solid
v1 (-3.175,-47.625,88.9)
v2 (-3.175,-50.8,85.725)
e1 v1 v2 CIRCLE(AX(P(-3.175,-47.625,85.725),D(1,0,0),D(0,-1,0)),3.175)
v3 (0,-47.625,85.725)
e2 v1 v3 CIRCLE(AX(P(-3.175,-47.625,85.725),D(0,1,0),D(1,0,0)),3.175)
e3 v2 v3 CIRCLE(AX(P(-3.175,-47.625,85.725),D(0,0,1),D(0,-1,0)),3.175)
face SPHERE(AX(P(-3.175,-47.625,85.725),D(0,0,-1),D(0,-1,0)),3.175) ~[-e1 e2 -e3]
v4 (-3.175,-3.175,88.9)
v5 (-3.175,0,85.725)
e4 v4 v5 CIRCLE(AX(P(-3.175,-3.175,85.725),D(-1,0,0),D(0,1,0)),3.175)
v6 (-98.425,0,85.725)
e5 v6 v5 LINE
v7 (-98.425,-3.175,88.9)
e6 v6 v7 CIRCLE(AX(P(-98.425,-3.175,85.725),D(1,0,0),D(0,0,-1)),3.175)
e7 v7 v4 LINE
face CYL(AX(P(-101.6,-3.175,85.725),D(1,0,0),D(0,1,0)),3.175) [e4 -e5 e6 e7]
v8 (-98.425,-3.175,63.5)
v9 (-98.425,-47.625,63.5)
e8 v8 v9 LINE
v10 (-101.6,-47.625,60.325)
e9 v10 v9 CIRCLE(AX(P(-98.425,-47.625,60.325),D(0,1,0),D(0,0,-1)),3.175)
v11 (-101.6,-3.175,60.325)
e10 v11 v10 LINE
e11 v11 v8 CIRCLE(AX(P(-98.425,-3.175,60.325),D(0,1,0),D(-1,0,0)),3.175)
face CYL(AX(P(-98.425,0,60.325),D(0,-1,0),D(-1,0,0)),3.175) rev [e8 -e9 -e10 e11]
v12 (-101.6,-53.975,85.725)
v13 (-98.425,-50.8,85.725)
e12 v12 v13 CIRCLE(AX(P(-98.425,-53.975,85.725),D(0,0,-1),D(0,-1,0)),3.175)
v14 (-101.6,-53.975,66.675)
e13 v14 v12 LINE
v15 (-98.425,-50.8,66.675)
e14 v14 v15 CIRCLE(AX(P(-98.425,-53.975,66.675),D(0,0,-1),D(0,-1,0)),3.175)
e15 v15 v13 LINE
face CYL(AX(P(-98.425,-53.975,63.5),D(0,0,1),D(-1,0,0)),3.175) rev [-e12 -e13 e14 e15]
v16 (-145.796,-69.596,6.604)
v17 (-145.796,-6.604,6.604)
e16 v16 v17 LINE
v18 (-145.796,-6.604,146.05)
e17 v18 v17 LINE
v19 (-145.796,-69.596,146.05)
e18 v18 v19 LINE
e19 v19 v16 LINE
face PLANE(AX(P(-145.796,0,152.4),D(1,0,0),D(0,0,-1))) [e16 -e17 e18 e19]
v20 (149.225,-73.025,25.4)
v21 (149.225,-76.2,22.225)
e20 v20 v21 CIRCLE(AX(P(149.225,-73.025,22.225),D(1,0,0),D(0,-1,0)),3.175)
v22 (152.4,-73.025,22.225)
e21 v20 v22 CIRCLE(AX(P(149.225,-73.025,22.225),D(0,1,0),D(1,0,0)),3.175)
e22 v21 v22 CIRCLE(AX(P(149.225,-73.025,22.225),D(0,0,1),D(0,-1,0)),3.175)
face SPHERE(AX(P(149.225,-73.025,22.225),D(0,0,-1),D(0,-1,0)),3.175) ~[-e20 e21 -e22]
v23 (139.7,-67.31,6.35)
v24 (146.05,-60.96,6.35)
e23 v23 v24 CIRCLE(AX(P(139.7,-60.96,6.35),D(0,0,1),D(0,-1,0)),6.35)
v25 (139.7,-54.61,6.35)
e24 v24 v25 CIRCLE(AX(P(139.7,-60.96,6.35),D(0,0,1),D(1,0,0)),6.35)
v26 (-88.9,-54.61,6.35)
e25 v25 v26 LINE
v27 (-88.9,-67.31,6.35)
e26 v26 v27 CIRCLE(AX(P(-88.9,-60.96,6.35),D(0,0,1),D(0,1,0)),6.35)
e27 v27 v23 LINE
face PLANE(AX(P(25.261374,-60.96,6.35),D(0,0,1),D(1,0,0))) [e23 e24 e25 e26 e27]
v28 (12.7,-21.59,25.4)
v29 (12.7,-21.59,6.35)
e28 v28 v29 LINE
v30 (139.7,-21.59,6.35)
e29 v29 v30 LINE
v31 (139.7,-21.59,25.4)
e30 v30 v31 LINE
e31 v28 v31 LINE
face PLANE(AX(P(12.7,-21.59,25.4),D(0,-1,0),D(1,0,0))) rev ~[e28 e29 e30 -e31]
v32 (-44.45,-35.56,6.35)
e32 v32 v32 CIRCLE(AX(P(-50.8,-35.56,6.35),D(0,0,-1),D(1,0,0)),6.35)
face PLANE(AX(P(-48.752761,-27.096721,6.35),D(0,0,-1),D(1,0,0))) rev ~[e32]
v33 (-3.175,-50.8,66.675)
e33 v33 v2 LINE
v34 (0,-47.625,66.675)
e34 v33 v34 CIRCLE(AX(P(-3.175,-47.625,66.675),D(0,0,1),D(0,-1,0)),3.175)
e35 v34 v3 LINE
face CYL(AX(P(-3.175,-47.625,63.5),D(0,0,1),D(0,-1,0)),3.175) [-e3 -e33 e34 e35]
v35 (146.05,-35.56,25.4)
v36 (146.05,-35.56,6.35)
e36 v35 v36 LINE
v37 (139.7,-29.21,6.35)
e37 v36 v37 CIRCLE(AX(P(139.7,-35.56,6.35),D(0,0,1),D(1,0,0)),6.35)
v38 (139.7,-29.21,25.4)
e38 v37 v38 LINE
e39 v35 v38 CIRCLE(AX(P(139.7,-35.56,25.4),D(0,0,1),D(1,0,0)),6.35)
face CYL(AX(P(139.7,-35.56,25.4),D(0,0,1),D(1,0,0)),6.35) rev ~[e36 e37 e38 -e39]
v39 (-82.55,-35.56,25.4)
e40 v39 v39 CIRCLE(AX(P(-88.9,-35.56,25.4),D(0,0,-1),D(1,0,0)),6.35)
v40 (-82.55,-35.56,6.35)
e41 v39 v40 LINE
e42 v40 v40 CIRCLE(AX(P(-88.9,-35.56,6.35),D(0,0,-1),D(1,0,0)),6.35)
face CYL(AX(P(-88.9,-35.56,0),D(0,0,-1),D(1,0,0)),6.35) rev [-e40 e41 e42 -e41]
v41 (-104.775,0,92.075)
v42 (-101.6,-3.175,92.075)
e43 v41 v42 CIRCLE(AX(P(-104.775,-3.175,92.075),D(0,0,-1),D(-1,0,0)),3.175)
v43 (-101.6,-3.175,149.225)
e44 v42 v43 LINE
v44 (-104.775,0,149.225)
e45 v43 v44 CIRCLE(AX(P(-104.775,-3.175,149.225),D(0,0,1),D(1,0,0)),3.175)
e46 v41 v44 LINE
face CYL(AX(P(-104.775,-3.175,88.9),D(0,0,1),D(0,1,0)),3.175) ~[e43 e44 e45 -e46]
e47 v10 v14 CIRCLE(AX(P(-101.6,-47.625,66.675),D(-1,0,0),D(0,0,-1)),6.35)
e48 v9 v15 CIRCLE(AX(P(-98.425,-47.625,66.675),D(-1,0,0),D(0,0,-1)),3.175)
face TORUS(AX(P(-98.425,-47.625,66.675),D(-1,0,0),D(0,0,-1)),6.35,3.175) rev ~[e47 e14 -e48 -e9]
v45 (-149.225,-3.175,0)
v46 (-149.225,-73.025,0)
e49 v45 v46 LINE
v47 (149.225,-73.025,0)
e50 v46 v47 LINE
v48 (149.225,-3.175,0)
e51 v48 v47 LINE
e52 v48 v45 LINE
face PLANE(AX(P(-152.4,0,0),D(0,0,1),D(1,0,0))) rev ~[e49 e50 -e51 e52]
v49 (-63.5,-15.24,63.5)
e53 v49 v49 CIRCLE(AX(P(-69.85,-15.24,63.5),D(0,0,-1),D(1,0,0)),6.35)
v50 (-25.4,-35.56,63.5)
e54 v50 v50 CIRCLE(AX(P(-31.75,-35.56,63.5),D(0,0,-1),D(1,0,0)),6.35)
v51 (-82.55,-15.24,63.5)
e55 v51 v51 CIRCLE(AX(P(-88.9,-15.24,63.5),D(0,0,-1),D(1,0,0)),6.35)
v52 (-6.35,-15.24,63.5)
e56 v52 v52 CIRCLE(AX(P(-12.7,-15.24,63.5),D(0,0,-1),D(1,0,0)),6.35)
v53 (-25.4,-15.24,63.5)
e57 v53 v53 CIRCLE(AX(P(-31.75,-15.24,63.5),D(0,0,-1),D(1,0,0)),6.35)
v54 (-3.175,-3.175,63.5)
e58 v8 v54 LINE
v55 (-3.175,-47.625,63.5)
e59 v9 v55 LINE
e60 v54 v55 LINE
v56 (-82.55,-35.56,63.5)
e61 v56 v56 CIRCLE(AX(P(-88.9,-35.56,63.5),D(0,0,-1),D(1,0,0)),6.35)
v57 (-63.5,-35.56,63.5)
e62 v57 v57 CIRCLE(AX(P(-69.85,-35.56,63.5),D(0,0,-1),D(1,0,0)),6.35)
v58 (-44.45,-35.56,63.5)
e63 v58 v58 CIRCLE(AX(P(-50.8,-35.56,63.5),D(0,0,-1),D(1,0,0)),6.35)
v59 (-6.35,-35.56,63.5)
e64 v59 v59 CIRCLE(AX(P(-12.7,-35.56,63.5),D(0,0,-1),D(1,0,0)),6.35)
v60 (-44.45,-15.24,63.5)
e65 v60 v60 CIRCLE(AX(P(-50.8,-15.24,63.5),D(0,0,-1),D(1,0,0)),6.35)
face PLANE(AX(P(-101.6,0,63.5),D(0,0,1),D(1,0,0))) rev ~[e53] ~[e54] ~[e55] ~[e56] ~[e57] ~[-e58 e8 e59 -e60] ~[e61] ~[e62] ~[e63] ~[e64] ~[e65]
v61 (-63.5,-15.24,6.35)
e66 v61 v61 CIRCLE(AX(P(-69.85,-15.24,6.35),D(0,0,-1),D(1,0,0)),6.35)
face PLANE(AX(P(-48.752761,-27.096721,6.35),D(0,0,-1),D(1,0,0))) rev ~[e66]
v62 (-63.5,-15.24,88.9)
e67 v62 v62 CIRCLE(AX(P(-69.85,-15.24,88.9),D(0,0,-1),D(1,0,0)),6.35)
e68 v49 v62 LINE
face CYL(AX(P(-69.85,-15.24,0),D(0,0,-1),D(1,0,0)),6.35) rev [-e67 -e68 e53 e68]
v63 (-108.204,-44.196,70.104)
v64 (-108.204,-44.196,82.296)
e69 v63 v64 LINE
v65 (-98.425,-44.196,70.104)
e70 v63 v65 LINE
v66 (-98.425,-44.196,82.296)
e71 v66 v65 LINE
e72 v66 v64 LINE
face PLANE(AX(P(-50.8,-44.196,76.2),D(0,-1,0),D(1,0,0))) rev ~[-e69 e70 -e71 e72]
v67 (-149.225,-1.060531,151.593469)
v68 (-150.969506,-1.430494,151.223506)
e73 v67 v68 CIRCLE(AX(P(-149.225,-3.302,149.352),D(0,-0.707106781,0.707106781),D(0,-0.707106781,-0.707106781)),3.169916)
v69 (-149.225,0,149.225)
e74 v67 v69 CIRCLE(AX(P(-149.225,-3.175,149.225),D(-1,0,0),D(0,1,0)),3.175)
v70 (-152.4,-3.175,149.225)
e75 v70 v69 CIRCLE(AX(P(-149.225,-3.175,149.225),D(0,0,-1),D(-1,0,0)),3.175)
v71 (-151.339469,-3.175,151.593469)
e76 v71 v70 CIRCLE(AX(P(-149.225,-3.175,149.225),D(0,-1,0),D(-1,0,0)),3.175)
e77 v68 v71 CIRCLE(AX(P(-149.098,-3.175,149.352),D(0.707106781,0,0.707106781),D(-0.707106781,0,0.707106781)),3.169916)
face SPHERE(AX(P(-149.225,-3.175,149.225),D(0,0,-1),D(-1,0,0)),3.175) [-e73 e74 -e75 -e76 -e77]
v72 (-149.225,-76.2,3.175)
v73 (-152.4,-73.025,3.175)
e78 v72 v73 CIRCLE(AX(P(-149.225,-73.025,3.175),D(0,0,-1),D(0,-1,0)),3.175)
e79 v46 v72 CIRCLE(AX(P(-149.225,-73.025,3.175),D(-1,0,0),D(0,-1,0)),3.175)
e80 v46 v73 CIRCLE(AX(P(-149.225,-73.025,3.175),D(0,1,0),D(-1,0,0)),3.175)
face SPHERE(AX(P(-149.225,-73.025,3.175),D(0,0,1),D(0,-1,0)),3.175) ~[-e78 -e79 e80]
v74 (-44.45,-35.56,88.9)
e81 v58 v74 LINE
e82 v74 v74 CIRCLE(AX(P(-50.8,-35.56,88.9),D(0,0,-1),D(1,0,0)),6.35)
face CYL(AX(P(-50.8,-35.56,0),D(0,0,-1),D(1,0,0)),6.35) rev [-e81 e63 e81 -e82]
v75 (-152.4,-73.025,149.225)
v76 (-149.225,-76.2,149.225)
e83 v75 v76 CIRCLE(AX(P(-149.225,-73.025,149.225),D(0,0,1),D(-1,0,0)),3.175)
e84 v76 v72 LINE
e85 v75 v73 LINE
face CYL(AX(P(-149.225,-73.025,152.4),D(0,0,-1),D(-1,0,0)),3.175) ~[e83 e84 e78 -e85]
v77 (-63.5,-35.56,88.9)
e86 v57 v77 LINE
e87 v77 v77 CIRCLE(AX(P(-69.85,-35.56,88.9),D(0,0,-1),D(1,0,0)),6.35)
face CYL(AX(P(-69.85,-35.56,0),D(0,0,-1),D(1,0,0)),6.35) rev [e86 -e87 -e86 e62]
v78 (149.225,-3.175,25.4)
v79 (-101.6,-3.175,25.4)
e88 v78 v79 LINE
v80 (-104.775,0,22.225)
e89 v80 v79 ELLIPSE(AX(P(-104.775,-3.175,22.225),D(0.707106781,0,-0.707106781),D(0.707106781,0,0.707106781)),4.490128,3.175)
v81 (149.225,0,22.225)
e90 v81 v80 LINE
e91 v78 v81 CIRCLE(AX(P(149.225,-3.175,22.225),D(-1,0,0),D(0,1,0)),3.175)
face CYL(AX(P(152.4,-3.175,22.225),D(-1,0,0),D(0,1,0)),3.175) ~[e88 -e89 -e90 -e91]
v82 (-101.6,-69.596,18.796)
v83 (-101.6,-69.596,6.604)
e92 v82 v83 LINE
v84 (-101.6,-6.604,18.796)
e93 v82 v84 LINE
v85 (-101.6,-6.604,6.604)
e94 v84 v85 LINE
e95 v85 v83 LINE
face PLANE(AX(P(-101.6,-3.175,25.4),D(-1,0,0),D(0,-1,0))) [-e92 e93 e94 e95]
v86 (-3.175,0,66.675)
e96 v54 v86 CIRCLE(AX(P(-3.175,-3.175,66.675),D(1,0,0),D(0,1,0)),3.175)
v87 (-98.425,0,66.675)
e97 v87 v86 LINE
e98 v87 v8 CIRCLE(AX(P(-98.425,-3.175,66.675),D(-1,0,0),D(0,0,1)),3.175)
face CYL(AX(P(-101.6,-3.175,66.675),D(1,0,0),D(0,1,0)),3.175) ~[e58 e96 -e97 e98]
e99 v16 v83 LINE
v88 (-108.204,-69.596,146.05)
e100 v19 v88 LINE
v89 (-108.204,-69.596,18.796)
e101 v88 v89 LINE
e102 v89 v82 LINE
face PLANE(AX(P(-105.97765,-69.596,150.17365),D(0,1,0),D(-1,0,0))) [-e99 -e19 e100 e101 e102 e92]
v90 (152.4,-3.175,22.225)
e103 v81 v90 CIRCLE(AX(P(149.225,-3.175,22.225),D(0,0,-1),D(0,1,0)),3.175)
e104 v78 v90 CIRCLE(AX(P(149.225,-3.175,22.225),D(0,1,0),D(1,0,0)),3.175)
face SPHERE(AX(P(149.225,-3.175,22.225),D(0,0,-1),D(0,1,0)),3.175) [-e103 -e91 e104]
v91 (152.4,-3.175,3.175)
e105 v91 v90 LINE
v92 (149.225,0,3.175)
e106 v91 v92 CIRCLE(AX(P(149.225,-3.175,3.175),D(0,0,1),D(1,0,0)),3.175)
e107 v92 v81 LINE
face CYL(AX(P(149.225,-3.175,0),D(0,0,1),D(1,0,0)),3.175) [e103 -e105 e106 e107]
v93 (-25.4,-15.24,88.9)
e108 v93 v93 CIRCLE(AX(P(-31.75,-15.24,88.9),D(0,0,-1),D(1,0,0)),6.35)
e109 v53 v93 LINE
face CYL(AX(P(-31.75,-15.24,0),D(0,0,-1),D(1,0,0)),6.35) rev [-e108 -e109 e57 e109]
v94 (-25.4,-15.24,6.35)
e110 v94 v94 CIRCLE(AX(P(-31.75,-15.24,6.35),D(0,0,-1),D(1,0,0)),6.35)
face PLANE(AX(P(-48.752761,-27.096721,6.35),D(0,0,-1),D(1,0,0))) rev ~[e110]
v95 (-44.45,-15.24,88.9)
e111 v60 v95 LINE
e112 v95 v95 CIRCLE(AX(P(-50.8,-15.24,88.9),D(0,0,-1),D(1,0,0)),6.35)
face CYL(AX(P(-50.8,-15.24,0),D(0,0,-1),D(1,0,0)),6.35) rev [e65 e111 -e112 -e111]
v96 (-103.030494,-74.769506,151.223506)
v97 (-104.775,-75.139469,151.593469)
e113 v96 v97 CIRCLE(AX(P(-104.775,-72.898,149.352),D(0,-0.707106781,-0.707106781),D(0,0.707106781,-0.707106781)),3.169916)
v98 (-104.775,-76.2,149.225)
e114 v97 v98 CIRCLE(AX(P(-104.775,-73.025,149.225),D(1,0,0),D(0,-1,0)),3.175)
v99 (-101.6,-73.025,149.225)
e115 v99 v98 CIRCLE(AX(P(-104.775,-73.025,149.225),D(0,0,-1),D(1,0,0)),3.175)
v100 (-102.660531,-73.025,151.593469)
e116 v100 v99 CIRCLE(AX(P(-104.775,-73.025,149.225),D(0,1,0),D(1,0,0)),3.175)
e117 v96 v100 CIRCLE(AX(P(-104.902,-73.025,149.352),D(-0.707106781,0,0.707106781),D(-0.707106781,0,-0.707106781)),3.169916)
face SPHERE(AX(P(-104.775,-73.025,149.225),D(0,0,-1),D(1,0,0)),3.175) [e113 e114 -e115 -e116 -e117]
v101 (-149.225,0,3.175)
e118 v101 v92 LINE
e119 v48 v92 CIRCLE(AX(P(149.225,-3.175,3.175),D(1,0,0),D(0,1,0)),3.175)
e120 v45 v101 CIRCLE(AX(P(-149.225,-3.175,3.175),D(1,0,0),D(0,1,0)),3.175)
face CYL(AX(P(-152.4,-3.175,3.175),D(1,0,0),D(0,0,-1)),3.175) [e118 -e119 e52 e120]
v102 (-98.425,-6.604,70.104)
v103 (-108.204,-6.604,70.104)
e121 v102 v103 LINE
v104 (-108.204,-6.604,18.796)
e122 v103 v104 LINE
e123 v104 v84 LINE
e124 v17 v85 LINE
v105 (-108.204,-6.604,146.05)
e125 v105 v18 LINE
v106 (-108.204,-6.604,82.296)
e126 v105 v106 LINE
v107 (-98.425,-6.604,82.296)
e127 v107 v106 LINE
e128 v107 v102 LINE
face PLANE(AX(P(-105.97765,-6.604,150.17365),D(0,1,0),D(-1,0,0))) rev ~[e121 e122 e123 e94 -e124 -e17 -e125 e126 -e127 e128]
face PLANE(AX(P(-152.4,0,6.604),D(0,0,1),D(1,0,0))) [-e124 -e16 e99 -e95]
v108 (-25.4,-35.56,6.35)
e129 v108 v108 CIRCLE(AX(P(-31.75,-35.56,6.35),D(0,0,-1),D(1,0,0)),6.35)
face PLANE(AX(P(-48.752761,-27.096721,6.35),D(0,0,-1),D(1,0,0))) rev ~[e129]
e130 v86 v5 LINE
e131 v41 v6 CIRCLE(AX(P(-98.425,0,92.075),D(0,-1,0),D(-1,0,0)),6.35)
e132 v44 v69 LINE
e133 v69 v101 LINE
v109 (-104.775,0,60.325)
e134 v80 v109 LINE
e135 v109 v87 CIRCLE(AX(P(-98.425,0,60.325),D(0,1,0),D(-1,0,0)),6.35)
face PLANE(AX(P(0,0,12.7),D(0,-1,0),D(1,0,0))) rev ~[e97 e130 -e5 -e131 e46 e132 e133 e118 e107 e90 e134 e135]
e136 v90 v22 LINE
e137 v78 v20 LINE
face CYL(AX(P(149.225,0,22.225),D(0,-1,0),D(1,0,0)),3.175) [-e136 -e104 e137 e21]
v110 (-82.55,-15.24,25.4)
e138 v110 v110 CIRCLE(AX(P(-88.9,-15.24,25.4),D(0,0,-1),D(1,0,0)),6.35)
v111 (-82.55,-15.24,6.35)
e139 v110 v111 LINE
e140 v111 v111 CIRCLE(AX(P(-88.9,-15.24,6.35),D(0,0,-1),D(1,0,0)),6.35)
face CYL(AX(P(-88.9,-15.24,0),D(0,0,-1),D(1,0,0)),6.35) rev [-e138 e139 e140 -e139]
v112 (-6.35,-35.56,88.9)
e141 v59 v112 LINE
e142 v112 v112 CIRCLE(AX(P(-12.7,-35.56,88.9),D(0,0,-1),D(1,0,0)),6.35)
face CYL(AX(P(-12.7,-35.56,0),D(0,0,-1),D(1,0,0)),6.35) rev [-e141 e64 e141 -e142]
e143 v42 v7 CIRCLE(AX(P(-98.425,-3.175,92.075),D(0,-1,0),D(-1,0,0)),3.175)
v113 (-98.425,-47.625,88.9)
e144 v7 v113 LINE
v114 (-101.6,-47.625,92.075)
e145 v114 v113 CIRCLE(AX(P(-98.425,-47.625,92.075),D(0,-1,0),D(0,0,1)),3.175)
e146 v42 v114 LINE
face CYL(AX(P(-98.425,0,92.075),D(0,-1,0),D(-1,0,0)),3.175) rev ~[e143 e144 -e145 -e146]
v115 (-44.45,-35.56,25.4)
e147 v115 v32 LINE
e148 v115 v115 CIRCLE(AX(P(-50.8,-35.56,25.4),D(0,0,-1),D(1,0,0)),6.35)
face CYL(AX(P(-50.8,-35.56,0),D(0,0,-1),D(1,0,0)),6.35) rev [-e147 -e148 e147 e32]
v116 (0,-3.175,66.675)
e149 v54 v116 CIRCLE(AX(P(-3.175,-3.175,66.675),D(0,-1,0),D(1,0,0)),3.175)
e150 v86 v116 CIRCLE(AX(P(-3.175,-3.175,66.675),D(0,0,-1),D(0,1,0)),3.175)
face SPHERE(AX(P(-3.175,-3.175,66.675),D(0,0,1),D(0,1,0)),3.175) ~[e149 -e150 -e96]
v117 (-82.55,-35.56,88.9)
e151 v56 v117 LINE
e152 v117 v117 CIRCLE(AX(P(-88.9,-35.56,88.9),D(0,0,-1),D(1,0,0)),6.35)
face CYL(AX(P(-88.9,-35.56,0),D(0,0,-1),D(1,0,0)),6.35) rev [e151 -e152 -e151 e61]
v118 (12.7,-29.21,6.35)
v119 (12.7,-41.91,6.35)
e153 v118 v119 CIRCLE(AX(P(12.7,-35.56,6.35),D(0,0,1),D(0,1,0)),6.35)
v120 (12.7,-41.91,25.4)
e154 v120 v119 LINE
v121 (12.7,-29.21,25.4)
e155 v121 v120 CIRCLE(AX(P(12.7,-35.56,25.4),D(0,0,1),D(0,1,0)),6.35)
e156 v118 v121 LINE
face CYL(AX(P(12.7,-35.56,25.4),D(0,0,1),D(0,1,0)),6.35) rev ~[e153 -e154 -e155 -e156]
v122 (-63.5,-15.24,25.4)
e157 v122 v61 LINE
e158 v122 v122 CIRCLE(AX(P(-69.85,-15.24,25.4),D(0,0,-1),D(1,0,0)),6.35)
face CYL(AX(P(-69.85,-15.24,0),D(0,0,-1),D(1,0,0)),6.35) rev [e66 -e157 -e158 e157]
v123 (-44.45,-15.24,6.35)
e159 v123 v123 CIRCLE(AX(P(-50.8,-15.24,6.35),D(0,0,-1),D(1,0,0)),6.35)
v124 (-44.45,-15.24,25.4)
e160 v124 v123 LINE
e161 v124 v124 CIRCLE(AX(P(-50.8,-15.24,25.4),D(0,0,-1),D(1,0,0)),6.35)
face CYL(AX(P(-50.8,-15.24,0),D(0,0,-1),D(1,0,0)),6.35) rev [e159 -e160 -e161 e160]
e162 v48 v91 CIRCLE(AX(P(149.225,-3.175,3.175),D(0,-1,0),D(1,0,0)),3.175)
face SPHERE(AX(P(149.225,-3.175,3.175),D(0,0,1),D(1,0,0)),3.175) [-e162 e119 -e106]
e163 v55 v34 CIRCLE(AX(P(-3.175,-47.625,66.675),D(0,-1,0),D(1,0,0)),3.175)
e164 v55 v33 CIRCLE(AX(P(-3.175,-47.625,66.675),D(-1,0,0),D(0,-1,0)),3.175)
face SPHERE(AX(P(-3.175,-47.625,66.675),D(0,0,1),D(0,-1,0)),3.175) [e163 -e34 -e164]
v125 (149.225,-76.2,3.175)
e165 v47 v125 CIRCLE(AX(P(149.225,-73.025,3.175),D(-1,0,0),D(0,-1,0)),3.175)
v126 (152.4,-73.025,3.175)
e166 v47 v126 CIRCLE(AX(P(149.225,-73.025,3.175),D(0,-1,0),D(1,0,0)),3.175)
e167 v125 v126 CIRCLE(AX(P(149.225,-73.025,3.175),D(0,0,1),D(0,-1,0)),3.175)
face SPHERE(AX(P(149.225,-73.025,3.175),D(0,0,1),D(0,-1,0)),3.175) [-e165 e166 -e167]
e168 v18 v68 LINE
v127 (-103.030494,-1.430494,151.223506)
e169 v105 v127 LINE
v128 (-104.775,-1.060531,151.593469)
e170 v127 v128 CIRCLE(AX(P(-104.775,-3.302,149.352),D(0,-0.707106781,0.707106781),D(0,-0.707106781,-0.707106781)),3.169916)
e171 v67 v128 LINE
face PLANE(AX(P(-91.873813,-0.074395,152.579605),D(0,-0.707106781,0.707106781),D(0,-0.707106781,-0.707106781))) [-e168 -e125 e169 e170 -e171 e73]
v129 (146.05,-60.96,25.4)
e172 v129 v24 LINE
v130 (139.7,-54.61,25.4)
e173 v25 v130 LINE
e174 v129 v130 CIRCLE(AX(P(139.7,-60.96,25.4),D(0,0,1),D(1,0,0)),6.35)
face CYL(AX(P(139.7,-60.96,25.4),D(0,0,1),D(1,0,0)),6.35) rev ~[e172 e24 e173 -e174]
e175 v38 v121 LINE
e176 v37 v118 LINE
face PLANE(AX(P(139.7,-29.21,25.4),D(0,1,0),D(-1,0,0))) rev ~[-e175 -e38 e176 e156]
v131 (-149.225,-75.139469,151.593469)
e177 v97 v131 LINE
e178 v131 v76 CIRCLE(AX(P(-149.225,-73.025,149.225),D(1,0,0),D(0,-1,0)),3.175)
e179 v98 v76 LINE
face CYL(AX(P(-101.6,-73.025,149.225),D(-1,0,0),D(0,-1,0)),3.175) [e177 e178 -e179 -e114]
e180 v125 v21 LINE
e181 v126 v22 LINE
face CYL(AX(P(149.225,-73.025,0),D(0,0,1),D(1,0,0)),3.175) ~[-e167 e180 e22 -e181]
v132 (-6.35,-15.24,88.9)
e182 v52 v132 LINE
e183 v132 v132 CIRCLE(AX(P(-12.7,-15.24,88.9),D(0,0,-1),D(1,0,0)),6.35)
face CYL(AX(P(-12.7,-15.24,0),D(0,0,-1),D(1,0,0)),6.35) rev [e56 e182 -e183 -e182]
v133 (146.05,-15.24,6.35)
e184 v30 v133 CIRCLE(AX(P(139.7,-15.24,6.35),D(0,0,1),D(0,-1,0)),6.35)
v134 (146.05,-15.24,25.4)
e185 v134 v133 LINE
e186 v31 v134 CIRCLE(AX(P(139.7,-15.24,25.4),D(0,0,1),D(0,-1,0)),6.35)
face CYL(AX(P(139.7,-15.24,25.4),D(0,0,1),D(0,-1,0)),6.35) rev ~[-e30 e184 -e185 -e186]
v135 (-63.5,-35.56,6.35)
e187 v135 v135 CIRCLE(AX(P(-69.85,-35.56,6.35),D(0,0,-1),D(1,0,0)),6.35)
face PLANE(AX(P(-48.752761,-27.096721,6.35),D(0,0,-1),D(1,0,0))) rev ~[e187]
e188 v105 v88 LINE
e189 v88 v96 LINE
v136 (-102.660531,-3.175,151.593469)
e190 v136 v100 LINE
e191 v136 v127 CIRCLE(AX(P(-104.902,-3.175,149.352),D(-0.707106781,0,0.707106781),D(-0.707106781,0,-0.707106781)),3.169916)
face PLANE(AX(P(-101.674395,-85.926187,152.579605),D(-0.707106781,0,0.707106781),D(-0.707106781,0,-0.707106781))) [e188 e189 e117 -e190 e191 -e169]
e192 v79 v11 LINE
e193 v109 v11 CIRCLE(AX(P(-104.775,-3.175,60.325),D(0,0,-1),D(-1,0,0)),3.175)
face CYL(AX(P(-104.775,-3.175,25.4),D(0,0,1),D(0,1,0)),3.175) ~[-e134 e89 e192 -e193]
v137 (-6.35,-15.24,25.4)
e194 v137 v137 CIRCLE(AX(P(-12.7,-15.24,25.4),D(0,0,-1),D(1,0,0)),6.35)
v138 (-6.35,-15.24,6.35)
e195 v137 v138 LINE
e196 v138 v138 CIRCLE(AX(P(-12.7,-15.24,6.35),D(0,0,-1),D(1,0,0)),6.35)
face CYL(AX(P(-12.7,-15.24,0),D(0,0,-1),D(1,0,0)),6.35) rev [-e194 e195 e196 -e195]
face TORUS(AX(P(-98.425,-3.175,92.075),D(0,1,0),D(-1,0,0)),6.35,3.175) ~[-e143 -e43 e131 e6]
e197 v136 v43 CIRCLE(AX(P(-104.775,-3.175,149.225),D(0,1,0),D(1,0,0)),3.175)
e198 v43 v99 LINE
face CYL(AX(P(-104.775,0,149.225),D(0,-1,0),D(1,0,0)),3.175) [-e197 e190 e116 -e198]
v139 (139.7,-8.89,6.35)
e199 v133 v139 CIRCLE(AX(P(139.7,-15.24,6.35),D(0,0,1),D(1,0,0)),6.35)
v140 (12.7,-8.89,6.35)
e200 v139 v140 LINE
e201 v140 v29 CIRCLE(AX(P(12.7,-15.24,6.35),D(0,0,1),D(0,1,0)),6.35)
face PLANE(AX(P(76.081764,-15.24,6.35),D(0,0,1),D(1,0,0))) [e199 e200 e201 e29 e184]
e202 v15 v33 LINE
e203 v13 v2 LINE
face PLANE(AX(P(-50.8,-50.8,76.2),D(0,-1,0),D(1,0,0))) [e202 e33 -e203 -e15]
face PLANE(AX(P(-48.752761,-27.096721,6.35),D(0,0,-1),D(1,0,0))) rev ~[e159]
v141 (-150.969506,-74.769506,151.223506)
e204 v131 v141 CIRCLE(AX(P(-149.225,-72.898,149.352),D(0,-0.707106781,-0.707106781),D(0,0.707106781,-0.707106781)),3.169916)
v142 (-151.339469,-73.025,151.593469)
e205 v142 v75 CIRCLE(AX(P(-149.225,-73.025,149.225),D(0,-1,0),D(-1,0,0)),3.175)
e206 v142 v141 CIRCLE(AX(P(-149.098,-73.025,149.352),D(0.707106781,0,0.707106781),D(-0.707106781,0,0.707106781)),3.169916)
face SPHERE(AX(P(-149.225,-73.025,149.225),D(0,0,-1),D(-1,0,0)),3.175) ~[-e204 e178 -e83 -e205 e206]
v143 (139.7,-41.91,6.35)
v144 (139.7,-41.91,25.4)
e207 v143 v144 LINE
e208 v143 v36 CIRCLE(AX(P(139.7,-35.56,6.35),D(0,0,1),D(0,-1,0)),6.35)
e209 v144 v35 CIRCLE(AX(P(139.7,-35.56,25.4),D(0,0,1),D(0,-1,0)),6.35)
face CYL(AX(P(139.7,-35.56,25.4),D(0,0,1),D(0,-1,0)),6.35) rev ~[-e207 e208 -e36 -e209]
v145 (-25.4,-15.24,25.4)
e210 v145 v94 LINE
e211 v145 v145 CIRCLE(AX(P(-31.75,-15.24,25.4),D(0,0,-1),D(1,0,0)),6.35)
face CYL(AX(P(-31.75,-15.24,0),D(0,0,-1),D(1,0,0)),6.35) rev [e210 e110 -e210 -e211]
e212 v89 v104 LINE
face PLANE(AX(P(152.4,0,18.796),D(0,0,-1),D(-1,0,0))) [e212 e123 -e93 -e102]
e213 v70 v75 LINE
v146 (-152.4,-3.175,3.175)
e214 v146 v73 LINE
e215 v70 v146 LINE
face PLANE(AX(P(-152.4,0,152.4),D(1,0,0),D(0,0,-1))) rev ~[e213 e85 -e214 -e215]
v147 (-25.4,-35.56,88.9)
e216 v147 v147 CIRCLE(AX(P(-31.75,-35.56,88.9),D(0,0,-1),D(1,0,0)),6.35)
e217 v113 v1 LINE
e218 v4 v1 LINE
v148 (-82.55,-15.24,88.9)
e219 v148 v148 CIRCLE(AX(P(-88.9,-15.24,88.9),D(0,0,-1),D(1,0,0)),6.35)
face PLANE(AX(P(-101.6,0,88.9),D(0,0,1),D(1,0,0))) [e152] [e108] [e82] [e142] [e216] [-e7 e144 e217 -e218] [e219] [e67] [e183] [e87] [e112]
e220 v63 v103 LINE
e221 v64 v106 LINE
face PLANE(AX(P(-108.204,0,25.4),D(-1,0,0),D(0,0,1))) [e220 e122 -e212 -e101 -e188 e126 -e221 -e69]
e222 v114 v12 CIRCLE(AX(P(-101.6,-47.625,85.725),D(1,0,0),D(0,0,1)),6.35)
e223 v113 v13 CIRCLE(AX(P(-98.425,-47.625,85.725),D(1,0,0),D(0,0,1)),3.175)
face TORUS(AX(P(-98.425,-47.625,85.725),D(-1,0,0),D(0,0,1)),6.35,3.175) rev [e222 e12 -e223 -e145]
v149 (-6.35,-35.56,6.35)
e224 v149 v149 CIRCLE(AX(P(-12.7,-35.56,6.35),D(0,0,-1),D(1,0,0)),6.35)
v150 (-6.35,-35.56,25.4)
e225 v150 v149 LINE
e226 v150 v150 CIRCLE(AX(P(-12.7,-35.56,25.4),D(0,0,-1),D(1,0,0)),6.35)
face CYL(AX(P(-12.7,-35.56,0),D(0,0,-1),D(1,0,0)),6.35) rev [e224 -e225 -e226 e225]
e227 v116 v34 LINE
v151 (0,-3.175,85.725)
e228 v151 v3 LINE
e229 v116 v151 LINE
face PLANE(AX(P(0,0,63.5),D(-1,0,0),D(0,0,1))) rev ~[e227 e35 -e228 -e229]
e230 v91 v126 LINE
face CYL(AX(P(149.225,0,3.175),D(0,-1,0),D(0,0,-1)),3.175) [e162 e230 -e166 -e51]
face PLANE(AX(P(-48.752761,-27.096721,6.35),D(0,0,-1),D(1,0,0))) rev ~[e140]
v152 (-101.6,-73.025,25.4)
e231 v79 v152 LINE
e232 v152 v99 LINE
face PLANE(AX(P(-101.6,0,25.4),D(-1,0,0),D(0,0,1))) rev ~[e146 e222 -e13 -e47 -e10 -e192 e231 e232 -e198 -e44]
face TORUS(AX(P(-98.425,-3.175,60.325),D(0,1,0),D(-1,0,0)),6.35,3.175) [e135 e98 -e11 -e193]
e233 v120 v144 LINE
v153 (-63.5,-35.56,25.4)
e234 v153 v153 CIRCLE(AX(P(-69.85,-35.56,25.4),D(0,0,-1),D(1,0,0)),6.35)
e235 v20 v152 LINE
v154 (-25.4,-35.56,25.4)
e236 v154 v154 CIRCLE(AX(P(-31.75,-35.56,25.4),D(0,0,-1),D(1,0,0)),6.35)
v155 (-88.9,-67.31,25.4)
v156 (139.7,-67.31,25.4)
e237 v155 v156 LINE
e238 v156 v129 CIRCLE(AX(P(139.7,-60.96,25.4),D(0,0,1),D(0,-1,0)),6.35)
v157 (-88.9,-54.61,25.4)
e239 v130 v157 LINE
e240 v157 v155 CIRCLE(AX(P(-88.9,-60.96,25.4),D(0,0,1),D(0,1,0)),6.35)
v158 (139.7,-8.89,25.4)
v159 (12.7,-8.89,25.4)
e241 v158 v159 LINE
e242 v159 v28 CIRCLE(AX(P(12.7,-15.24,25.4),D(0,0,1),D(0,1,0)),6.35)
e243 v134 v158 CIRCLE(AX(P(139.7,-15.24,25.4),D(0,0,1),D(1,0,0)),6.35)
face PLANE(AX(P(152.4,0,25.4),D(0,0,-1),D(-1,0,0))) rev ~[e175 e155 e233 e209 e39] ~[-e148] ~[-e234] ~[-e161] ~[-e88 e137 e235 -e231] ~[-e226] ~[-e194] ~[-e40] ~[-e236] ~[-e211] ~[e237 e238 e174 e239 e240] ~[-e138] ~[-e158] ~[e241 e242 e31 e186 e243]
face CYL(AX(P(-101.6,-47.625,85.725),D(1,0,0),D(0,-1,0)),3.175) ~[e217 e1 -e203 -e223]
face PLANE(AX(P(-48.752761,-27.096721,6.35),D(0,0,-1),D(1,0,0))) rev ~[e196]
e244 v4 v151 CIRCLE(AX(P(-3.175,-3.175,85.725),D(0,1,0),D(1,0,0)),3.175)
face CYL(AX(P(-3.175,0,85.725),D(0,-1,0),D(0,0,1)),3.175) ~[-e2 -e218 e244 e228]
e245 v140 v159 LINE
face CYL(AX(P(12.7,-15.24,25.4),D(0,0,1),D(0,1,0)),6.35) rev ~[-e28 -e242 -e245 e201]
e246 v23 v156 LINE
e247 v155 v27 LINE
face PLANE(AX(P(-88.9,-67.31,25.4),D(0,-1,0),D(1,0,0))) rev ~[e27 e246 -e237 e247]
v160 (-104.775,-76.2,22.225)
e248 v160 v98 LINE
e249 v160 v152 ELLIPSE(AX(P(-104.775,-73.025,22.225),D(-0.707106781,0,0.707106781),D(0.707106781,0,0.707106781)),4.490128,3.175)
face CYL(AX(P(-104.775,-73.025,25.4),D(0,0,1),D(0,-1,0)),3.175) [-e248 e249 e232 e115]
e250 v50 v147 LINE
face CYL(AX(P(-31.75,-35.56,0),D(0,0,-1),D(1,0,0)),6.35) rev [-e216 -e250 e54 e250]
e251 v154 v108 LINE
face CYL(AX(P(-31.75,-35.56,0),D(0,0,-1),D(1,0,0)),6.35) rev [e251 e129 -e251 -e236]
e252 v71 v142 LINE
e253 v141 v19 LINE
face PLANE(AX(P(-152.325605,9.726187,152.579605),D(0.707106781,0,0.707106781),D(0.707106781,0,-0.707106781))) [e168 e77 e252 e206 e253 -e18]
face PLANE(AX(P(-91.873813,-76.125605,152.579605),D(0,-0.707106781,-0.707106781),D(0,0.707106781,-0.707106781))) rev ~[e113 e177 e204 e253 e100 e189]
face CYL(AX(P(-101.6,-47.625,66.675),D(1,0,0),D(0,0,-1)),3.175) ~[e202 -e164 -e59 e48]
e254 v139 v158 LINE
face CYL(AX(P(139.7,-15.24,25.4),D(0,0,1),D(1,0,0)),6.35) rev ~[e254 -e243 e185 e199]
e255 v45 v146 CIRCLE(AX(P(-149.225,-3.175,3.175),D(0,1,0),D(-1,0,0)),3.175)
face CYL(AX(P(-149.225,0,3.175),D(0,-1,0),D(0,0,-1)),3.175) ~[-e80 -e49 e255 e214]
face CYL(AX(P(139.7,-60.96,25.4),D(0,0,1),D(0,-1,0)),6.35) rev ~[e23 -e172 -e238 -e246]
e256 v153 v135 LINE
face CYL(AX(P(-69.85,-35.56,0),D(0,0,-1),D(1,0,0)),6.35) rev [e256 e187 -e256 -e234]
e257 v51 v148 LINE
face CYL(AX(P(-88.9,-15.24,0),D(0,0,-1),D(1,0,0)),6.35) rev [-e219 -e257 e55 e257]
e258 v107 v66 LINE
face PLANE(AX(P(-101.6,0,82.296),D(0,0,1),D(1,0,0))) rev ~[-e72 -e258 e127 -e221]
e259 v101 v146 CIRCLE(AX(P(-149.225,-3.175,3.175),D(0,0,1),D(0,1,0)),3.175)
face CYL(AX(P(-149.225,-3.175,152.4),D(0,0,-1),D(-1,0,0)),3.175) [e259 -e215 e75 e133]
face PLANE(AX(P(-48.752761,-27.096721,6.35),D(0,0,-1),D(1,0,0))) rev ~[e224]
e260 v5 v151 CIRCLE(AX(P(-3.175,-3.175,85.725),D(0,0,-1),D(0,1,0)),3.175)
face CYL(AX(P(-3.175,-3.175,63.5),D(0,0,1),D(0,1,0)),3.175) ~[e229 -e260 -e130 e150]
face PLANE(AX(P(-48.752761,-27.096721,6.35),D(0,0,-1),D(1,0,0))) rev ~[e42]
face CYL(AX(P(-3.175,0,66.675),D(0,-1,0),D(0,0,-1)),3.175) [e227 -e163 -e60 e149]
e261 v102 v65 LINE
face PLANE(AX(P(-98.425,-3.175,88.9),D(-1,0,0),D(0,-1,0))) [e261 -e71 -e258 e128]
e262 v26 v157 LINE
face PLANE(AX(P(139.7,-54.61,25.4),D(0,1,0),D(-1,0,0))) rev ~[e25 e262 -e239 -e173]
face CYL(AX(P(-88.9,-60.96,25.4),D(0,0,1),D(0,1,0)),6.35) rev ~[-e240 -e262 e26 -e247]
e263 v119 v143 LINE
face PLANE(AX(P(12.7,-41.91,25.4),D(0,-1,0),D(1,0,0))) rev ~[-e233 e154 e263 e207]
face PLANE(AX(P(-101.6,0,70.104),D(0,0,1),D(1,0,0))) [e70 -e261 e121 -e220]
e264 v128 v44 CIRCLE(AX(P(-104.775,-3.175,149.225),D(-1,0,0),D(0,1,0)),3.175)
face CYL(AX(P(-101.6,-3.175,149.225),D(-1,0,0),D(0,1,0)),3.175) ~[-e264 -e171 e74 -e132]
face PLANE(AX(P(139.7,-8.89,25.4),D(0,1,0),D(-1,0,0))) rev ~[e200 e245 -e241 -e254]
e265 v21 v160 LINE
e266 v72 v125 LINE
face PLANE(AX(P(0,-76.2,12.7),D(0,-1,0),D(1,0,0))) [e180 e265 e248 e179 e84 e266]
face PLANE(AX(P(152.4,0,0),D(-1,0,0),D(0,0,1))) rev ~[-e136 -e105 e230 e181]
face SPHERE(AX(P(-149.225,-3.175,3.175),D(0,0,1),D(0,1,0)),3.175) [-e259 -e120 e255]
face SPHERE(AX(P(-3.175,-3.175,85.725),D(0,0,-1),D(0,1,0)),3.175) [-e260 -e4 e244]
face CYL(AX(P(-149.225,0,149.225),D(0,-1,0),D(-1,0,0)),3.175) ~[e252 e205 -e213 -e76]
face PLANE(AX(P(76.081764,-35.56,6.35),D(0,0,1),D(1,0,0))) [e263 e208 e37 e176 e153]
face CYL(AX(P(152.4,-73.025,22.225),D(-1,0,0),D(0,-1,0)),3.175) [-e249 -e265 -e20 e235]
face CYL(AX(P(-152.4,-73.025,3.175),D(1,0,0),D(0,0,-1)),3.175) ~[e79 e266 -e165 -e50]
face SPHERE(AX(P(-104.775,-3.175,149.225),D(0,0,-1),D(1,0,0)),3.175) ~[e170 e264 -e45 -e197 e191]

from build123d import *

# Parameters (mm, degrees)
F1_DEPTH      = 76.2
F0_W          = 101.6
F0_H          = 25.4
F2_DEPTH      = 50.8
F3_T          = -6.604
F4_R          = 3.175
F5_R          = 6.35
F6_DEPTH      = 95.25
F7_W          = 119.4815961644
F7_H          = 43.3120825328
F8_DEPTH      = 6.35
F10_DEPTH     = 19.05
F11_DEPTH     = 25.4
F12_DEPTH     = 25.4
F13_T1_DEPTH  = 62.992
F13_T3_DEPTH  = 37.592
F13_T9_DEPTH  = 79.3221869736
F13_T13_DEPTH = 53.9221869736
F13_T20_DEPTH = 79.3221869736
F13_T24_DEPTH = 53.9221869736
F13_T31_DEPTH = 53.9221869736
F13_T35_DEPTH = 79.3221869736
F13_T42_DEPTH = 79.3221869736
F13_T46_DEPTH = 53.9221869736


# Not quite as in the source:
# - a fillet or chamfer that OpenCascade refuses, or shapes differently, is made with other operations: its cross-section is extruded or revolved along the edge and cut away or added


with BuildPart() as f1:
    # F0 (on Front) → F1 (new body)
    with BuildSketch(Plane.XZ):
        Polygon((-152.4, 25.4), (-152.4, 0), (152.4, 0), (152.4, 25.4), (-101.6, 25.4), align=None)
        Polygon((-152.4, 152.4), (-152.4, 25.4), (-101.6, 25.4), (-101.6, 63.5), (-101.6, 88.9), (-101.6, 152.4), align=None)
    extrude(amount=F1_DEPTH)

    # F0 (on Front) → F2 (join)
    with BuildSketch(Plane.XZ):
        with Locations((-50.8, 76.2)):
            Rectangle(F0_W, F0_H)
    extrude(amount=F2_DEPTH)

    # F3
    f3_openings = [f1.faces().sort_by_distance(p)[0] for p in [
        (-127, -38.1, 152.4),
    ]]
    offset(amount=F3_T, openings=f3_openings, kind=Kind.INTERSECTION)

    # F4
    f4_edges = [f1.edges().sort_by_distance(p)[0] for p in [
        (-152.4, -76.2, 76.2),
        (-101.6, -76.2, 88.9),
        (0, -50.8, 76.2),
        (0, 0, 76.2),
        (-152.4, 0, 76.2),
        (-101.6, 0, 44.45),
        (-101.6, 0, 120.65),
        (152.4, 0, 12.7),
        (152.4, -76.2, 12.7),
        (-101.6, -50.8, 76.2),
        (-50.8, 0, 88.9),
        (-50.8, -50.8, 88.9),
        (-50.8, -50.8, 63.5),
        (-50.8, 0, 63.5),
        (25.4, 0, 25.4),
        (0, -76.2, 0),
        (25.4, -76.2, 25.4),
        (152.4, -38.1, 25.4),
        (152.4, -38.1, 0),
        (0, 0, 0),
        (-152.4, -38.1, 0),
        (0, -25.4, 63.5),
        (0, -25.4, 88.9),
        (-101.6, -38.1, 152.4),
        (-152.4, -38.1, 152.4),
        (-127, -76.2, 152.4),
        (-127, 0, 152.4),
        (-101.6, -25.4, 63.5),
        (-101.6, -25.4, 88.9),
    ]]
    fillet(f4_edges, radius=F4_R)

    # F5 (on Top) → F6 (cut)
    with BuildSketch(Plane.XY):
        with Locations((-12.7, -35.56)):
            Circle(F5_R)
        with Locations((-12.7, -15.24)):
            Circle(F5_R)
        with Locations((-31.75, -35.56)):
            Circle(F5_R)
        with Locations((-31.75, -15.24)):
            Circle(F5_R)
        with Locations((-50.8, -35.56)):
            Circle(F5_R)
        with Locations((-50.8, -15.24)):
            Circle(F5_R)
        with Locations((-69.85, -35.56)):
            Circle(F5_R)
        with Locations((-69.85, -15.24)):
            Circle(F5_R)
        with Locations((-88.9, -35.56)):
            Circle(F5_R)
        with Locations((-88.9, -15.24)):
            Circle(F5_R)
    extrude(amount=F6_DEPTH, mode=Mode.SUBTRACT)

    # F7 (on face) → F8 (join)
    with BuildSketch(Plane(origin=(0, 0, 0), x_dir=(1, 0, 0), z_dir=(0, 0, -1))):
        with Locations((-48.7527609803, 27.0967211109)):
            Rectangle(F7_W, F7_H)
    extrude(amount=-F8_DEPTH)

    # F9 (on face) → F10 (cut)
    with BuildSketch(Plane.XY.offset(25.4)):
        with BuildLine():
            ThreePointArc((-88.9, -54.61), (-84.4098719395, -56.4698719395), (-82.55, -60.96))
            ThreePointArc((-82.55, -60.96), (-84.4098719395, -65.4501280605), (-88.9, -67.31))
            Line((-88.9, -67.31), (139.7, -67.31))
            ThreePointArc((139.7, -67.31), (133.35, -60.96), (139.7, -54.61))
            Line((139.7, -54.61), (-88.9, -54.61))
        make_face()
        with BuildLine():
            ThreePointArc((12.7, -29.21), (17.1901280605, -31.0698719395), (19.05, -35.56))
            ThreePointArc((19.05, -35.56), (17.1901280605, -40.0501280605), (12.7, -41.91))
            Line((12.7, -41.91), (139.7, -41.91))
            ThreePointArc((139.7, -41.91), (133.35, -35.56), (139.7, -29.21))
            Line((139.7, -29.21), (12.7, -29.21))
        make_face()
        with BuildLine():
            ThreePointArc((12.7, -8.89), (17.1901280605, -10.7498719395), (19.05, -15.24))
            ThreePointArc((19.05, -15.24), (17.1901280605, -19.7301280605), (12.7, -21.59))
            Line((12.7, -21.59), (139.7, -21.59))
            ThreePointArc((139.7, -21.59), (133.35, -15.24), (139.7, -8.89))
            Line((139.7, -8.89), (12.7, -8.89))
        make_face()
        with BuildLine():
            ThreePointArc((146.05, -60.96), (144.1901280605, -56.4698719395), (139.7, -54.61))
            ThreePointArc((139.7, -54.61), (133.35, -60.96), (139.7, -67.31))
            ThreePointArc((139.7, -67.31), (144.1901280605, -65.4501280605), (146.05, -60.96))
        make_face()
        with BuildLine():
            ThreePointArc((146.05, -15.24), (144.1901280605, -10.7498719395), (139.7, -8.89))
            ThreePointArc((139.7, -8.89), (133.35, -15.24), (139.7, -21.59))
            ThreePointArc((139.7, -21.59), (144.1901280605, -19.7301280605), (146.05, -15.24))
        make_face()
        with BuildLine():
            ThreePointArc((146.05, -35.56), (144.1901280605, -31.0698719395), (139.7, -29.21))
            ThreePointArc((139.7, -29.21), (133.35, -35.56), (139.7, -41.91))
            ThreePointArc((139.7, -41.91), (144.1901280605, -40.0501280605), (146.05, -35.56))
        make_face()
        with BuildLine():
            ThreePointArc((12.7, -41.91), (17.1901280605, -40.0501280605), (19.05, -35.56))
            ThreePointArc((19.05, -35.56), (17.1901280605, -31.0698719395), (12.7, -29.21))
            ThreePointArc((12.7, -29.21), (6.35, -35.56), (12.7, -41.91))
        make_face()
        with BuildLine():
            ThreePointArc((12.7, -21.59), (17.1901280605, -19.7301280605), (19.05, -15.24))
            ThreePointArc((19.05, -15.24), (17.1901280605, -10.7498719395), (12.7, -8.89))
            ThreePointArc((12.7, -8.89), (6.35, -15.24), (12.7, -21.59))
        make_face()
        with BuildLine():
            ThreePointArc((-88.9, -67.31), (-84.4098719395, -65.4501280605), (-82.55, -60.96))
            ThreePointArc((-82.55, -60.96), (-84.4098719395, -56.4698719395), (-88.9, -54.61))
            ThreePointArc((-88.9, -54.61), (-95.25, -60.96), (-88.9, -67.31))
        make_face()
    extrude(amount=-F10_DEPTH, mode=Mode.SUBTRACT)

    # F11 (add): a face of the model
    f11_faces = [f1.faces().sort_by_distance(p)[0] for p in [
        (-50.8, -25.4, 88.9),
    ]]
    extrude(f11_faces, amount=-F11_DEPTH)

    # F12 (add): a face of the model
    f12_faces = [f1.faces().sort_by_distance(p)[0] for p in [
        (-98.9963064096, -38.1, 25.4),
    ]]
    extrude(f12_faces, amount=-F12_DEPTH)

    # F13: chamfer of 6.35 on 20 edges, made by hand

    # F13_s2 → F13_t1 (cut)
    with BuildSketch(Plane.XZ.offset(6.604)):
        with BuildLine():
            Line((-101.6743948776, 152.5796051224), (-108.3836051224, 145.8703948776))
            Line((-108.3836051224, 145.8703948776), (-108.5106051224, 145.8703948776))
            ThreePointArc((-108.5106051224, 145.8703948776), (-108.331, 149.1351974388), (-108.331, 152.4))
            Line((-108.331, 152.4), (-108.204, 152.527))
            ThreePointArc((-108.204, 152.527), (-104.9391974388, 152.527), (-101.6743948776, 152.7066051224))
            Line((-101.6743948776, 152.7066051224), (-101.6743948776, 152.5796051224))
        make_face()
        with BuildLine():
            Line((-152.3256051224, 152.5796051224), (-145.6163948776, 145.8703948776))
            Line((-145.6163948776, 145.8703948776), (-145.4893948776, 145.8703948776))
            ThreePointArc((-145.4893948776, 145.8703948776), (-145.669, 149.1351974388), (-145.669, 152.4))
            Line((-145.669, 152.4), (-145.796, 152.527))
            ThreePointArc((-145.796, 152.527), (-149.0608025612, 152.527), (-152.3256051224, 152.7066051224))
            Line((-152.3256051224, 152.7066051224), (-152.3256051224, 152.5796051224))
        make_face()
    extrude(amount=F13_T1_DEPTH, mode=Mode.SUBTRACT)

    # F13_s4 → F13_t3 (cut)
    with BuildSketch(Plane.YZ.offset(-145.796)):
        with BuildLine():
            Line((-0.0743948776, 152.5796051224), (-6.7836051224, 145.8703948776))
            Line((-6.7836051224, 145.8703948776), (-6.9106051224, 145.8703948776))
            ThreePointArc((-6.9106051224, 145.8703948776), (-6.731, 149.1351974388), (-6.731, 152.4))
            Line((-6.731, 152.4), (-6.604, 152.527))
            ThreePointArc((-6.604, 152.527), (-3.3391974388, 152.527), (-0.0743948776, 152.7066051224))
            Line((-0.0743948776, 152.7066051224), (-0.0743948776, 152.5796051224))
        make_face()
        with BuildLine():
            Line((-76.1256051224, 152.5796051224), (-69.4163948776, 145.8703948776))
            Line((-69.4163948776, 145.8703948776), (-69.2893948776, 145.8703948776))
            ThreePointArc((-69.2893948776, 145.8703948776), (-69.469, 149.1351974388), (-69.469, 152.4))
            Line((-69.469, 152.4), (-69.596, 152.527))
            ThreePointArc((-69.596, 152.527), (-72.8608025612, 152.527), (-76.1256051224, 152.7066051224))
            Line((-76.1256051224, 152.7066051224), (-76.1256051224, 152.5796051224))
        make_face()
    extrude(amount=F13_T3_DEPTH, mode=Mode.SUBTRACT)


with BuildPart() as f13_tool7:
    # F13_s8 → F13_t9 (new body)
    with BuildSketch(Plane.XZ.offset(85.9261869736)):
        with BuildLine():
            Line((-101.6743948776, 152.5796051224), (-108.3836051224, 145.8703948776))
            Line((-108.3836051224, 145.8703948776), (-108.5106051224, 145.8703948776))
            ThreePointArc((-108.5106051224, 145.8703948776), (-108.331, 149.1351974388), (-108.331, 152.4))
            Line((-108.331, 152.4), (-108.204, 152.527))
            ThreePointArc((-108.204, 152.527), (-104.9391974388, 152.527), (-101.6743948776, 152.7066051224))
            Line((-101.6743948776, 152.7066051224), (-101.6743948776, 152.5796051224))
        make_face()
    extrude(amount=-F13_T9_DEPTH)

    split(bisect_by=Plane.XZ.offset(69.596), keep=Keep.TOP)


with BuildPart() as f13_tool11:
    # F13_s12 → F13_t13 (new body)
    with BuildSketch(Plane.YZ.offset(-91.8738130264)):
        with BuildLine():
            Line((-76.1256051224, 152.5796051224), (-69.4163948776, 145.8703948776))
            Line((-69.4163948776, 145.8703948776), (-69.2893948776, 145.8703948776))
            ThreePointArc((-69.2893948776, 145.8703948776), (-69.469, 149.1351974388), (-69.469, 152.4))
            Line((-69.469, 152.4), (-69.596, 152.527))
            ThreePointArc((-69.596, 152.527), (-72.8608025612, 152.527), (-76.1256051224, 152.7066051224))
            Line((-76.1256051224, 152.7066051224), (-76.1256051224, 152.5796051224))
        make_face()
    extrude(amount=-F13_T13_DEPTH)

    split(bisect_by=Plane.YZ.offset(-108.204), keep=Keep.TOP)


with BuildPart() as f13_tool7_1:
    add(f13_tool7.part)

    # F13_t15: intersect F13_tool11
    add(f13_tool11.part, mode=Mode.INTERSECT)


with BuildPart() as f1_1:
    add(f1.part)

    # F13_t5: cut F13_tool7
    add(f13_tool7_1.part, mode=Mode.SUBTRACT)


with BuildPart() as f13_tool18:
    # F13_s19 → F13_t20 (new body)
    with BuildSketch(Plane.XZ.offset(69.596)):
        with BuildLine():
            Line((-101.6743948776, 152.5796051224), (-108.3836051224, 145.8703948776))
            Line((-108.3836051224, 145.8703948776), (-108.5106051224, 145.8703948776))
            ThreePointArc((-108.5106051224, 145.8703948776), (-108.331, 149.1351974388), (-108.331, 152.4))
            Line((-108.331, 152.4), (-108.204, 152.527))
            ThreePointArc((-108.204, 152.527), (-104.9391974388, 152.527), (-101.6743948776, 152.7066051224))
            Line((-101.6743948776, 152.7066051224), (-101.6743948776, 152.5796051224))
        make_face()
    extrude(amount=-F13_T20_DEPTH)

    split(bisect_by=Plane.XZ.offset(6.604), keep=Keep.BOTTOM)


with BuildPart() as f13_tool22:
    # F13_s23 → F13_t24 (new body)
    with BuildSketch(Plane.YZ.offset(-91.8738130264)):
        with BuildLine():
            Line((-0.0743948776, 152.5796051224), (-6.7836051224, 145.8703948776))
            Line((-6.7836051224, 145.8703948776), (-6.9106051224, 145.8703948776))
            ThreePointArc((-6.9106051224, 145.8703948776), (-6.731, 149.1351974388), (-6.731, 152.4))
            Line((-6.731, 152.4), (-6.604, 152.527))
            ThreePointArc((-6.604, 152.527), (-3.3391974388, 152.527), (-0.0743948776, 152.7066051224))
            Line((-0.0743948776, 152.7066051224), (-0.0743948776, 152.5796051224))
        make_face()
    extrude(amount=-F13_T24_DEPTH)

    split(bisect_by=Plane.YZ.offset(-108.204), keep=Keep.TOP)


with BuildPart() as f13_tool18_1:
    add(f13_tool18.part)

    # F13_t26: intersect F13_tool22
    add(f13_tool22.part, mode=Mode.INTERSECT)


with BuildPart() as f1_2:
    add(f1_1.part)

    # F13_t16: cut F13_tool18
    add(f13_tool18_1.part, mode=Mode.SUBTRACT)


with BuildPart() as f13_tool29:
    # F13_s30 → F13_t31 (new body)
    with BuildSketch(Plane.YZ.offset(-108.204)):
        with BuildLine():
            Line((-0.0743948776, 152.5796051224), (-6.7836051224, 145.8703948776))
            Line((-6.7836051224, 145.8703948776), (-6.9106051224, 145.8703948776))
            ThreePointArc((-6.9106051224, 145.8703948776), (-6.731, 149.1351974388), (-6.731, 152.4))
            Line((-6.731, 152.4), (-6.604, 152.527))
            ThreePointArc((-6.604, 152.527), (-3.3391974388, 152.527), (-0.0743948776, 152.7066051224))
            Line((-0.0743948776, 152.7066051224), (-0.0743948776, 152.5796051224))
        make_face()
    extrude(amount=-F13_T31_DEPTH)

    split(bisect_by=Plane.YZ.offset(-145.796), keep=Keep.BOTTOM)


with BuildPart() as f13_tool33:
    # F13_s34 → F13_t35 (new body)
    with BuildSketch(Plane.XZ.offset(-9.7261869736)):
        with BuildLine():
            Line((-152.3256051224, 152.5796051224), (-145.6163948776, 145.8703948776))
            Line((-145.6163948776, 145.8703948776), (-145.4893948776, 145.8703948776))
            ThreePointArc((-145.4893948776, 145.8703948776), (-145.669, 149.1351974388), (-145.669, 152.4))
            Line((-145.669, 152.4), (-145.796, 152.527))
            ThreePointArc((-145.796, 152.527), (-149.0608025612, 152.527), (-152.3256051224, 152.7066051224))
            Line((-152.3256051224, 152.7066051224), (-152.3256051224, 152.5796051224))
        make_face()
    extrude(amount=F13_T35_DEPTH)

    split(bisect_by=Plane.XZ.offset(6.604), keep=Keep.BOTTOM)


with BuildPart() as f13_tool29_1:
    add(f13_tool29.part)

    # F13_t37: intersect F13_tool33
    add(f13_tool33.part, mode=Mode.INTERSECT)


with BuildPart() as f1_3:
    add(f1_2.part)

    # F13_t27: cut F13_tool29
    add(f13_tool29_1.part, mode=Mode.SUBTRACT)


with BuildPart() as f13_tool40:
    # F13_s41 → F13_t42 (new body)
    with BuildSketch(Plane.XZ.offset(6.604)):
        with BuildLine():
            Line((-152.3256051224, 152.5796051224), (-145.6163948776, 145.8703948776))
            Line((-145.6163948776, 145.8703948776), (-145.4893948776, 145.8703948776))
            ThreePointArc((-145.4893948776, 145.8703948776), (-145.669, 149.1351974388), (-145.669, 152.4))
            Line((-145.669, 152.4), (-145.796, 152.527))
            ThreePointArc((-145.796, 152.527), (-149.0608025612, 152.527), (-152.3256051224, 152.7066051224))
            Line((-152.3256051224, 152.7066051224), (-152.3256051224, 152.5796051224))
        make_face()
    extrude(amount=F13_T42_DEPTH)

    split(bisect_by=Plane.XZ.offset(69.596), keep=Keep.TOP)


with BuildPart() as f13_tool44:
    # F13_s45 → F13_t46 (new body)
    with BuildSketch(Plane.YZ.offset(-108.204)):
        with BuildLine():
            Line((-76.1256051224, 152.5796051224), (-69.4163948776, 145.8703948776))
            Line((-69.4163948776, 145.8703948776), (-69.2893948776, 145.8703948776))
            ThreePointArc((-69.2893948776, 145.8703948776), (-69.469, 149.1351974388), (-69.469, 152.4))
            Line((-69.469, 152.4), (-69.596, 152.527))
            ThreePointArc((-69.596, 152.527), (-72.8608025612, 152.527), (-76.1256051224, 152.7066051224))
            Line((-76.1256051224, 152.7066051224), (-76.1256051224, 152.5796051224))
        make_face()
    extrude(amount=-F13_T46_DEPTH)

    split(bisect_by=Plane.YZ.offset(-145.796), keep=Keep.BOTTOM)


with BuildPart() as f13_tool40_1:
    add(f13_tool40.part)

    # F13_t48: intersect F13_tool44
    add(f13_tool44.part, mode=Mode.INTERSECT)


with BuildPart() as f1_4:
    add(f1_3.part)

    # F13_t38: cut F13_tool40
    add(f13_tool40_1.part, mode=Mode.SUBTRACT)


solid = f1_4.part
